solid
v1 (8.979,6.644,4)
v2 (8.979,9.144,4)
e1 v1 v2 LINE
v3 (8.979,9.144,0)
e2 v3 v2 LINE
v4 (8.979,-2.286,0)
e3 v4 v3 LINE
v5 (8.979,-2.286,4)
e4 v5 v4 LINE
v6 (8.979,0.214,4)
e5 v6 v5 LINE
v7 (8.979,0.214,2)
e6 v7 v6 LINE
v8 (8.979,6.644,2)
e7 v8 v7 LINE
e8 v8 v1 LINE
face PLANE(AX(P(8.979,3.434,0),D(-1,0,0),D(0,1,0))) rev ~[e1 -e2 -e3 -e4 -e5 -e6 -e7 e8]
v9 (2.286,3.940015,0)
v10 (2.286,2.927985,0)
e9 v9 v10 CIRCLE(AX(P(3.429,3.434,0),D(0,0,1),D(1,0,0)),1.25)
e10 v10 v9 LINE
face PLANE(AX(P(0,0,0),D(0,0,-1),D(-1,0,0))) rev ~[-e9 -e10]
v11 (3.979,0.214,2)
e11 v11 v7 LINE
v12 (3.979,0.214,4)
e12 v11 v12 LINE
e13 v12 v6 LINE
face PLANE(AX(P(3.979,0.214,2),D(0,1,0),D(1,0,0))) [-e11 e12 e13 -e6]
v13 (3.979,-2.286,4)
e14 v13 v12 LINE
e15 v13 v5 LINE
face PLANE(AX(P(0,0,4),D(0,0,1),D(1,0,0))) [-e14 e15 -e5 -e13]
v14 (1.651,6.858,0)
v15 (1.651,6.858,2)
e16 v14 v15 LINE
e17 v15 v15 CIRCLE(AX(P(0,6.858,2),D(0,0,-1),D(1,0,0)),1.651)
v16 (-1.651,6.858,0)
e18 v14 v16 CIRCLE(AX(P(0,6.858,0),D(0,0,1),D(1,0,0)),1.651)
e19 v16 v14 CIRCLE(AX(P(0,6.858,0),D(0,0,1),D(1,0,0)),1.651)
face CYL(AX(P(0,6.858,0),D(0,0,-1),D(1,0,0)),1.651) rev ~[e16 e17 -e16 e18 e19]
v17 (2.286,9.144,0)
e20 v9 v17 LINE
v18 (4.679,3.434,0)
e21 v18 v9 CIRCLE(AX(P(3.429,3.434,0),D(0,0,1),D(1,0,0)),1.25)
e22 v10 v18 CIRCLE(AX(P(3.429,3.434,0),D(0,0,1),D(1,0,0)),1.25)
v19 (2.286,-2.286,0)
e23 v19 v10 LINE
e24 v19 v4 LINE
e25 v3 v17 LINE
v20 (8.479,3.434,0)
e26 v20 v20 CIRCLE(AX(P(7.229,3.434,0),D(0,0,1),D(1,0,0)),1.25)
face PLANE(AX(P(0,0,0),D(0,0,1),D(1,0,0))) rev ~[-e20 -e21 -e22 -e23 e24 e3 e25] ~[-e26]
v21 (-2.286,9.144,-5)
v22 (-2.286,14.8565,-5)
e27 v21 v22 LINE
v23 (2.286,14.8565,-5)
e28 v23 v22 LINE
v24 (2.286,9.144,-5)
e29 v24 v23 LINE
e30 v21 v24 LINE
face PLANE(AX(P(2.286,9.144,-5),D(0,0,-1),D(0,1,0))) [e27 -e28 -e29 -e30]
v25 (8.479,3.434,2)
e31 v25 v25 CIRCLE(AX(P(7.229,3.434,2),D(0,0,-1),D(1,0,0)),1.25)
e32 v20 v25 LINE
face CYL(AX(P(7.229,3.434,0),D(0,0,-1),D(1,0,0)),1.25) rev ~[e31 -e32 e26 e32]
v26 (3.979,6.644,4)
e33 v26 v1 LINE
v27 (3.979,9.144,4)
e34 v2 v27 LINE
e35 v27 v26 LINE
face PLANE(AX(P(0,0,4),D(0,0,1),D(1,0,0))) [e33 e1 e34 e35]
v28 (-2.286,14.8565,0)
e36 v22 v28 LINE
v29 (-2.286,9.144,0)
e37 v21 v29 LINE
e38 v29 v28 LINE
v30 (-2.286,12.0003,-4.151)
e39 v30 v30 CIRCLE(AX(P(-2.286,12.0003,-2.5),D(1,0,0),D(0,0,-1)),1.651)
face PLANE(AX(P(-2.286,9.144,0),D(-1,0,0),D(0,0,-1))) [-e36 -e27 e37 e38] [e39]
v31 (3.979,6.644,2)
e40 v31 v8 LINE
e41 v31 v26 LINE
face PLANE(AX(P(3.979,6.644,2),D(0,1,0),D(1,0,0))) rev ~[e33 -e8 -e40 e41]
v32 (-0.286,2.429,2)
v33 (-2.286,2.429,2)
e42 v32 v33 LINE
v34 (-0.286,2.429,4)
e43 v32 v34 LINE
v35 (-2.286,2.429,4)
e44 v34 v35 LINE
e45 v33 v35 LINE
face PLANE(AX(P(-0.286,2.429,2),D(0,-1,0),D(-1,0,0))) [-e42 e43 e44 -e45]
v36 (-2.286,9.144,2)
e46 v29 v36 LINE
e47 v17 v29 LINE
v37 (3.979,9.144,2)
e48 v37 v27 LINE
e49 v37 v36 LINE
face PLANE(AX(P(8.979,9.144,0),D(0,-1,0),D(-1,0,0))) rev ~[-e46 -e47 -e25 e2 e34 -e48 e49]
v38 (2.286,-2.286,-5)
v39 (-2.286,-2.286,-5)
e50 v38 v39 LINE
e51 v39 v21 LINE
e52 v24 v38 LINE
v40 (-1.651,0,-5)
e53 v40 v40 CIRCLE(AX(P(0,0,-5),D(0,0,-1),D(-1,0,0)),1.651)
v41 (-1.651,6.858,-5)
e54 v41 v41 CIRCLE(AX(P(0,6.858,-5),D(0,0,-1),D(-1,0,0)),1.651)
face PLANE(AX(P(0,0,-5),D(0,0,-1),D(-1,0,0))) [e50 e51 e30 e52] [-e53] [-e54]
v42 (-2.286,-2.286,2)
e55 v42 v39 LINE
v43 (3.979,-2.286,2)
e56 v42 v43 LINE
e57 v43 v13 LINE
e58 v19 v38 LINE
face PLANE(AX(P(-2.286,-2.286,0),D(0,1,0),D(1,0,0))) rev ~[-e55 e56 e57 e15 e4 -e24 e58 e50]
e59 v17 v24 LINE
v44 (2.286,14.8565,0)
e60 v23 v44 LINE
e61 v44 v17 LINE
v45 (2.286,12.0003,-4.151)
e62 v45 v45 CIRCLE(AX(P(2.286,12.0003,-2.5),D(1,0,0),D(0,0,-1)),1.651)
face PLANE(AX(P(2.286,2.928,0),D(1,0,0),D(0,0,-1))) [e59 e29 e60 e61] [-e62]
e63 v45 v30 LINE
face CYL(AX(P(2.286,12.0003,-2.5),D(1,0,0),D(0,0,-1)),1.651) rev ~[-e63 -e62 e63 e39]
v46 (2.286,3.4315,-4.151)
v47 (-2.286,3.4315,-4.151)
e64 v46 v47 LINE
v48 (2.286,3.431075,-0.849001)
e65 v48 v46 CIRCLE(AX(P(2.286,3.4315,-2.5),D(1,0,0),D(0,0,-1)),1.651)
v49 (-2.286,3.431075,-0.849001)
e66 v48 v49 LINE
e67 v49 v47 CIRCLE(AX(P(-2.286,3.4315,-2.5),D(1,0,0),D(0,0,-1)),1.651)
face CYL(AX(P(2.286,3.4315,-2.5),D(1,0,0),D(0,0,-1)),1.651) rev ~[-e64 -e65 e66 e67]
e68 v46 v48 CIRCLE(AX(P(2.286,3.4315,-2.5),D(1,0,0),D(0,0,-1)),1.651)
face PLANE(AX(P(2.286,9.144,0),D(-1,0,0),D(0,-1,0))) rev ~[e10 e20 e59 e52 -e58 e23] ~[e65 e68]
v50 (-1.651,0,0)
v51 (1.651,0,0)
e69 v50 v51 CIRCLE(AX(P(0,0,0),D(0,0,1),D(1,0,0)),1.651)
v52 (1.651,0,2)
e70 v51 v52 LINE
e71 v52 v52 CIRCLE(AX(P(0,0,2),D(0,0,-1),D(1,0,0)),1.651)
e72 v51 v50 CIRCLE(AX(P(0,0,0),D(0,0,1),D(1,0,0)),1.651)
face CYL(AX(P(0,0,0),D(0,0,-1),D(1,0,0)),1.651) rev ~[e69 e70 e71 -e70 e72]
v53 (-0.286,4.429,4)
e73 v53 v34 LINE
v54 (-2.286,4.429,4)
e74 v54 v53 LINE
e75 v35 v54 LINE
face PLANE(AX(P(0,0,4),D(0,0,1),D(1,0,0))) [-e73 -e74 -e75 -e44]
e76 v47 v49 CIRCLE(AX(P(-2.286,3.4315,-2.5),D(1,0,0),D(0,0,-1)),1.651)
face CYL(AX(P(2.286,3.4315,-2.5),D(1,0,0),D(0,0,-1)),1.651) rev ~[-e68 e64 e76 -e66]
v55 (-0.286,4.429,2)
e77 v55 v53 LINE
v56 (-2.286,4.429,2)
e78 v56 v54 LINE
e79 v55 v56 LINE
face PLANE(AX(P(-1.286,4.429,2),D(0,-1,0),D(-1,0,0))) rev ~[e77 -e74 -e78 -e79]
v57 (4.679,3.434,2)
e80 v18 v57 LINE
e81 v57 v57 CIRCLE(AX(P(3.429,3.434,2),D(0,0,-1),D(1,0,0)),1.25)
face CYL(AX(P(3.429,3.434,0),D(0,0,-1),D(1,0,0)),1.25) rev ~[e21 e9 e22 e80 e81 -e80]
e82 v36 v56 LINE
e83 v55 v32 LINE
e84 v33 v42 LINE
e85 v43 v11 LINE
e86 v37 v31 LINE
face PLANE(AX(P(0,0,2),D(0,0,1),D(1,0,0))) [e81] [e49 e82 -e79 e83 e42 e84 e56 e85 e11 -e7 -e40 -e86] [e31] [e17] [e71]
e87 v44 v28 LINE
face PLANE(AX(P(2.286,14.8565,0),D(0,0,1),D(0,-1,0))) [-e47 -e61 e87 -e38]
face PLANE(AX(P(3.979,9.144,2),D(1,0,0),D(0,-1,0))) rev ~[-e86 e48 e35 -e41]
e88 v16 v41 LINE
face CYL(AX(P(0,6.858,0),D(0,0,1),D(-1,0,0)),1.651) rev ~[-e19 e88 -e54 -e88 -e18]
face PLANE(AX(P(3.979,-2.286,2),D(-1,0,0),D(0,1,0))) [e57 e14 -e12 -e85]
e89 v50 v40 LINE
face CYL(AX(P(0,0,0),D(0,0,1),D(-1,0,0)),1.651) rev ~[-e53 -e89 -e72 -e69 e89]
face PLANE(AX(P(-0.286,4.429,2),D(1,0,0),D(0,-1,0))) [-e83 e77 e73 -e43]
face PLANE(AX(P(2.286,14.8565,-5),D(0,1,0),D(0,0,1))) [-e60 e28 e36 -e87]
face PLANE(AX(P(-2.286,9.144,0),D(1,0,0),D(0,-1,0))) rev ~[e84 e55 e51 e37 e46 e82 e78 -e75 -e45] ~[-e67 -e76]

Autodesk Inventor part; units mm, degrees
ref_plane "YZ Plane" through (0, 0, 0) normal (1, 0, 0) x (0, 1, 0)
ref_plane "XZ Plane" through (0, 0, 0) normal (0, 1, 0) x (-1, 0, 0)
ref_plane "XY Plane" through (0, 0, 0) normal (0, 0, 1) x (1, 0, 0)
sketch "Sketch21" plane through (0, 0, 0) normal (0, 0, 1) x (1, 0, 0)
  line L0 (0, 0) -> (0, 6.858)
  line L1 (0, 6.858) -> (3.429, 6.858)
  line L2 (3.429, 6.858) -> (3.429, 3.434)
  line L3 (3.429, 3.434) -> (7.229, 3.434)
  circle A0 centre (0, 0) radius 1.651
  circle A1 centre (0, 6.858) radius 1.651
  circle A2 centre (3.429, 3.434) radius 1.25
  circle A3 centre (7.229, 3.434) radius 1.25
  line L4 (7.229, 3.434) -> (8.979, 3.434)
  line L5 (8.979, 9.144) -> (-2.286, 9.144)
  line L6 (-2.286, 9.144) -> (-2.286, -2.286)
  line L7 (-2.286, -2.286) -> (8.979, -2.286)
  line L8 (8.979, -2.286) -> (8.979, 9.144)
  dimension "d76" = 6.858
  dimension "d77" = 3.429
  dimension "d78" = 3.424
  dimension "d79" = 3.8
  dimension "d80" = 3.302
  dimension "d81" = 3.302
  dimension "d82" = 2.5
  dimension "d83" = 2.5
  dimension "d84" = 1.75
extrude "Extrusion19" add sketch "Sketch21" along normal blind 2
sketch "Sketch22" plane through (0, 0, 2) normal (0, 0, 1) x (1, 0, 0)
  line L0 (-2.286, -2.286) -> (8.979, -2.286) projected
  line L1 (8.979, -2.286) -> (3.979, -2.286)
  line L2 (3.979, -2.286) -> (3.979, 0.214)
  line L3 (3.979, 0.214) -> (8.979, 0.214)
  line L4 (8.979, 0.214) -> (8.979, -2.286)
  line L5 (8.979, 9.144) -> (-2.286, 9.144) projected
  line L6 (8.979, 9.144) -> (3.979, 9.144)
  line L7 (3.979, 9.144) -> (3.979, 6.644)
  line L8 (3.979, 6.644) -> (8.979, 6.644)
  line L9 (8.979, 6.644) -> (8.979, 9.144)
  line L10 (-2.286, 9.144) -> (-2.286, -2.286) projected
  line L11 (-2.286, 3.429) -> (-1.286, 3.429)
  line L12 (-1.286, 3.429) -> (-1.286, 4.429)
  line L13 (-1.286, 4.429) -> (-2.286, 4.429)
  line L14 (-2.286, 4.429) -> (-2.286, 3.429)
  line L15 (-2.286, 4.429) -> (-0.286, 4.429)
  line L16 (-0.286, 4.429) -> (-0.286, 2.429)
  line L17 (-0.286, 2.429) -> (-2.286, 2.429)
  line L18 (-2.286, 2.429) -> (-2.286, 4.429)
  point P0 (0, 0)
  dimension "d89" = 5
  dimension "d90" = 2.5
  dimension "d91" = 5
  dimension "d92" = 2.5
  dimension "d93" = 1
  dimension "d94" = 1
  dimension "d95" = 2
  dimension "d96" = 2
extrude "Extrusion20" add sketch "Sketch22" along normal blind 2
sketch "Sketch23" plane through (0, 0, 0) normal (0, 0, -1) x (-1, 0, 0)
  circle A0 centre (0, 6.858) radius 1.651 projected
  circle A1 centre (0, 6.858) radius 2.286
  line L0 (2.286, 9.144) -> (2.286, -2.286) projected
  line L1 (-2.286, 6.858) -> (-2.286, -2.286)
  line L2 (-8.979, 9.144) -> (2.286, 9.144) projected
  line L3 (-2.286, -2.286) -> (2.286, -2.286)
  line L4 (2.286, -2.286) -> (2.286, 9.144)
  line L5 (2.286, 9.144) -> (-2.286, 9.144)
  line L6 (-2.286, 9.144) -> (-2.286, -2.286)
  circle A2 centre (0, 0) radius 1.651
extrude "Extrusion21" add sketch "Sketch23" along normal blind 5
sketch "Sketch24" plane through (2.286, 2.928, 0) normal (1, 0, 0) x (0, 0, -1)
  line L0 (5, -5.214) -> (5, 6.216) projected
  line L1 (5, 6.216) -> (-2, 6.216) projected
  line L2 (5, -5.214) -> (5, 6.216)
  line L3 (5, 0.501) -> (-9.7149, 0.501)
  line L4 (0, 1.012) -> (0, 0) projected
  line L5 (0, 0.506) -> (5, 0.501)
  circle A0 centre (2.5, 0.5035) radius 1.651
  point P0 (0, -2.928)
  dimension "d101" = 3.302
extrude "Extrusion22" cut sketch "Sketch24" against normal blind 5 contours A0 L3 | L3 A0
sketch "Sketch25" plane through (2.286, 2.928, 0) normal (1, 0, 0) x (0, 0, -1)
  circle A0 centre (2.5, 0.5035) radius 1.651 projected
  line L0 (5, 6.216) -> (-2, 6.216) projected
  line L1 (5, -5.214) -> (5, 6.216) projected
  circle A1 centre (2.5, 9.0723) radius 1.651
  line L2 (5, 11.9285) -> (0, 11.9285)
  line L3 (0, 11.9285) -> (0, 6.216)
  line L4 (0, 6.216) -> (5, 6.216)
  line L5 (5, 6.216) -> (5, 11.9285)
  point P0 (0, -2.928)
  dimension "d105" = 3.302
extrude "Extrusion23" add sketch "Sketch25" against normal blind 5 contours L0 L3 L2 L5
sketch "Sketch26" plane through (-2.714, 9.144, 0) normal (0, -1, 0) x (1, 0, 0)
  line L0 (0.428, 0) -> (0, 0) projected
  line L1 (5, -5) -> (0.428, -5) projected
  line L2 (0, 0) -> (0.428, 0)
  line L3 (0.428, 0) -> (0.428, -5)
  line L4 (0.428, -5) -> (0, -5)
  line L5 (0, -5) -> (0, 0)
  point P0 (2.714, 0)
extrude "Extrusion24" cut sketch "Sketch26" against normal blind 50
properties part number "SensorMount"
